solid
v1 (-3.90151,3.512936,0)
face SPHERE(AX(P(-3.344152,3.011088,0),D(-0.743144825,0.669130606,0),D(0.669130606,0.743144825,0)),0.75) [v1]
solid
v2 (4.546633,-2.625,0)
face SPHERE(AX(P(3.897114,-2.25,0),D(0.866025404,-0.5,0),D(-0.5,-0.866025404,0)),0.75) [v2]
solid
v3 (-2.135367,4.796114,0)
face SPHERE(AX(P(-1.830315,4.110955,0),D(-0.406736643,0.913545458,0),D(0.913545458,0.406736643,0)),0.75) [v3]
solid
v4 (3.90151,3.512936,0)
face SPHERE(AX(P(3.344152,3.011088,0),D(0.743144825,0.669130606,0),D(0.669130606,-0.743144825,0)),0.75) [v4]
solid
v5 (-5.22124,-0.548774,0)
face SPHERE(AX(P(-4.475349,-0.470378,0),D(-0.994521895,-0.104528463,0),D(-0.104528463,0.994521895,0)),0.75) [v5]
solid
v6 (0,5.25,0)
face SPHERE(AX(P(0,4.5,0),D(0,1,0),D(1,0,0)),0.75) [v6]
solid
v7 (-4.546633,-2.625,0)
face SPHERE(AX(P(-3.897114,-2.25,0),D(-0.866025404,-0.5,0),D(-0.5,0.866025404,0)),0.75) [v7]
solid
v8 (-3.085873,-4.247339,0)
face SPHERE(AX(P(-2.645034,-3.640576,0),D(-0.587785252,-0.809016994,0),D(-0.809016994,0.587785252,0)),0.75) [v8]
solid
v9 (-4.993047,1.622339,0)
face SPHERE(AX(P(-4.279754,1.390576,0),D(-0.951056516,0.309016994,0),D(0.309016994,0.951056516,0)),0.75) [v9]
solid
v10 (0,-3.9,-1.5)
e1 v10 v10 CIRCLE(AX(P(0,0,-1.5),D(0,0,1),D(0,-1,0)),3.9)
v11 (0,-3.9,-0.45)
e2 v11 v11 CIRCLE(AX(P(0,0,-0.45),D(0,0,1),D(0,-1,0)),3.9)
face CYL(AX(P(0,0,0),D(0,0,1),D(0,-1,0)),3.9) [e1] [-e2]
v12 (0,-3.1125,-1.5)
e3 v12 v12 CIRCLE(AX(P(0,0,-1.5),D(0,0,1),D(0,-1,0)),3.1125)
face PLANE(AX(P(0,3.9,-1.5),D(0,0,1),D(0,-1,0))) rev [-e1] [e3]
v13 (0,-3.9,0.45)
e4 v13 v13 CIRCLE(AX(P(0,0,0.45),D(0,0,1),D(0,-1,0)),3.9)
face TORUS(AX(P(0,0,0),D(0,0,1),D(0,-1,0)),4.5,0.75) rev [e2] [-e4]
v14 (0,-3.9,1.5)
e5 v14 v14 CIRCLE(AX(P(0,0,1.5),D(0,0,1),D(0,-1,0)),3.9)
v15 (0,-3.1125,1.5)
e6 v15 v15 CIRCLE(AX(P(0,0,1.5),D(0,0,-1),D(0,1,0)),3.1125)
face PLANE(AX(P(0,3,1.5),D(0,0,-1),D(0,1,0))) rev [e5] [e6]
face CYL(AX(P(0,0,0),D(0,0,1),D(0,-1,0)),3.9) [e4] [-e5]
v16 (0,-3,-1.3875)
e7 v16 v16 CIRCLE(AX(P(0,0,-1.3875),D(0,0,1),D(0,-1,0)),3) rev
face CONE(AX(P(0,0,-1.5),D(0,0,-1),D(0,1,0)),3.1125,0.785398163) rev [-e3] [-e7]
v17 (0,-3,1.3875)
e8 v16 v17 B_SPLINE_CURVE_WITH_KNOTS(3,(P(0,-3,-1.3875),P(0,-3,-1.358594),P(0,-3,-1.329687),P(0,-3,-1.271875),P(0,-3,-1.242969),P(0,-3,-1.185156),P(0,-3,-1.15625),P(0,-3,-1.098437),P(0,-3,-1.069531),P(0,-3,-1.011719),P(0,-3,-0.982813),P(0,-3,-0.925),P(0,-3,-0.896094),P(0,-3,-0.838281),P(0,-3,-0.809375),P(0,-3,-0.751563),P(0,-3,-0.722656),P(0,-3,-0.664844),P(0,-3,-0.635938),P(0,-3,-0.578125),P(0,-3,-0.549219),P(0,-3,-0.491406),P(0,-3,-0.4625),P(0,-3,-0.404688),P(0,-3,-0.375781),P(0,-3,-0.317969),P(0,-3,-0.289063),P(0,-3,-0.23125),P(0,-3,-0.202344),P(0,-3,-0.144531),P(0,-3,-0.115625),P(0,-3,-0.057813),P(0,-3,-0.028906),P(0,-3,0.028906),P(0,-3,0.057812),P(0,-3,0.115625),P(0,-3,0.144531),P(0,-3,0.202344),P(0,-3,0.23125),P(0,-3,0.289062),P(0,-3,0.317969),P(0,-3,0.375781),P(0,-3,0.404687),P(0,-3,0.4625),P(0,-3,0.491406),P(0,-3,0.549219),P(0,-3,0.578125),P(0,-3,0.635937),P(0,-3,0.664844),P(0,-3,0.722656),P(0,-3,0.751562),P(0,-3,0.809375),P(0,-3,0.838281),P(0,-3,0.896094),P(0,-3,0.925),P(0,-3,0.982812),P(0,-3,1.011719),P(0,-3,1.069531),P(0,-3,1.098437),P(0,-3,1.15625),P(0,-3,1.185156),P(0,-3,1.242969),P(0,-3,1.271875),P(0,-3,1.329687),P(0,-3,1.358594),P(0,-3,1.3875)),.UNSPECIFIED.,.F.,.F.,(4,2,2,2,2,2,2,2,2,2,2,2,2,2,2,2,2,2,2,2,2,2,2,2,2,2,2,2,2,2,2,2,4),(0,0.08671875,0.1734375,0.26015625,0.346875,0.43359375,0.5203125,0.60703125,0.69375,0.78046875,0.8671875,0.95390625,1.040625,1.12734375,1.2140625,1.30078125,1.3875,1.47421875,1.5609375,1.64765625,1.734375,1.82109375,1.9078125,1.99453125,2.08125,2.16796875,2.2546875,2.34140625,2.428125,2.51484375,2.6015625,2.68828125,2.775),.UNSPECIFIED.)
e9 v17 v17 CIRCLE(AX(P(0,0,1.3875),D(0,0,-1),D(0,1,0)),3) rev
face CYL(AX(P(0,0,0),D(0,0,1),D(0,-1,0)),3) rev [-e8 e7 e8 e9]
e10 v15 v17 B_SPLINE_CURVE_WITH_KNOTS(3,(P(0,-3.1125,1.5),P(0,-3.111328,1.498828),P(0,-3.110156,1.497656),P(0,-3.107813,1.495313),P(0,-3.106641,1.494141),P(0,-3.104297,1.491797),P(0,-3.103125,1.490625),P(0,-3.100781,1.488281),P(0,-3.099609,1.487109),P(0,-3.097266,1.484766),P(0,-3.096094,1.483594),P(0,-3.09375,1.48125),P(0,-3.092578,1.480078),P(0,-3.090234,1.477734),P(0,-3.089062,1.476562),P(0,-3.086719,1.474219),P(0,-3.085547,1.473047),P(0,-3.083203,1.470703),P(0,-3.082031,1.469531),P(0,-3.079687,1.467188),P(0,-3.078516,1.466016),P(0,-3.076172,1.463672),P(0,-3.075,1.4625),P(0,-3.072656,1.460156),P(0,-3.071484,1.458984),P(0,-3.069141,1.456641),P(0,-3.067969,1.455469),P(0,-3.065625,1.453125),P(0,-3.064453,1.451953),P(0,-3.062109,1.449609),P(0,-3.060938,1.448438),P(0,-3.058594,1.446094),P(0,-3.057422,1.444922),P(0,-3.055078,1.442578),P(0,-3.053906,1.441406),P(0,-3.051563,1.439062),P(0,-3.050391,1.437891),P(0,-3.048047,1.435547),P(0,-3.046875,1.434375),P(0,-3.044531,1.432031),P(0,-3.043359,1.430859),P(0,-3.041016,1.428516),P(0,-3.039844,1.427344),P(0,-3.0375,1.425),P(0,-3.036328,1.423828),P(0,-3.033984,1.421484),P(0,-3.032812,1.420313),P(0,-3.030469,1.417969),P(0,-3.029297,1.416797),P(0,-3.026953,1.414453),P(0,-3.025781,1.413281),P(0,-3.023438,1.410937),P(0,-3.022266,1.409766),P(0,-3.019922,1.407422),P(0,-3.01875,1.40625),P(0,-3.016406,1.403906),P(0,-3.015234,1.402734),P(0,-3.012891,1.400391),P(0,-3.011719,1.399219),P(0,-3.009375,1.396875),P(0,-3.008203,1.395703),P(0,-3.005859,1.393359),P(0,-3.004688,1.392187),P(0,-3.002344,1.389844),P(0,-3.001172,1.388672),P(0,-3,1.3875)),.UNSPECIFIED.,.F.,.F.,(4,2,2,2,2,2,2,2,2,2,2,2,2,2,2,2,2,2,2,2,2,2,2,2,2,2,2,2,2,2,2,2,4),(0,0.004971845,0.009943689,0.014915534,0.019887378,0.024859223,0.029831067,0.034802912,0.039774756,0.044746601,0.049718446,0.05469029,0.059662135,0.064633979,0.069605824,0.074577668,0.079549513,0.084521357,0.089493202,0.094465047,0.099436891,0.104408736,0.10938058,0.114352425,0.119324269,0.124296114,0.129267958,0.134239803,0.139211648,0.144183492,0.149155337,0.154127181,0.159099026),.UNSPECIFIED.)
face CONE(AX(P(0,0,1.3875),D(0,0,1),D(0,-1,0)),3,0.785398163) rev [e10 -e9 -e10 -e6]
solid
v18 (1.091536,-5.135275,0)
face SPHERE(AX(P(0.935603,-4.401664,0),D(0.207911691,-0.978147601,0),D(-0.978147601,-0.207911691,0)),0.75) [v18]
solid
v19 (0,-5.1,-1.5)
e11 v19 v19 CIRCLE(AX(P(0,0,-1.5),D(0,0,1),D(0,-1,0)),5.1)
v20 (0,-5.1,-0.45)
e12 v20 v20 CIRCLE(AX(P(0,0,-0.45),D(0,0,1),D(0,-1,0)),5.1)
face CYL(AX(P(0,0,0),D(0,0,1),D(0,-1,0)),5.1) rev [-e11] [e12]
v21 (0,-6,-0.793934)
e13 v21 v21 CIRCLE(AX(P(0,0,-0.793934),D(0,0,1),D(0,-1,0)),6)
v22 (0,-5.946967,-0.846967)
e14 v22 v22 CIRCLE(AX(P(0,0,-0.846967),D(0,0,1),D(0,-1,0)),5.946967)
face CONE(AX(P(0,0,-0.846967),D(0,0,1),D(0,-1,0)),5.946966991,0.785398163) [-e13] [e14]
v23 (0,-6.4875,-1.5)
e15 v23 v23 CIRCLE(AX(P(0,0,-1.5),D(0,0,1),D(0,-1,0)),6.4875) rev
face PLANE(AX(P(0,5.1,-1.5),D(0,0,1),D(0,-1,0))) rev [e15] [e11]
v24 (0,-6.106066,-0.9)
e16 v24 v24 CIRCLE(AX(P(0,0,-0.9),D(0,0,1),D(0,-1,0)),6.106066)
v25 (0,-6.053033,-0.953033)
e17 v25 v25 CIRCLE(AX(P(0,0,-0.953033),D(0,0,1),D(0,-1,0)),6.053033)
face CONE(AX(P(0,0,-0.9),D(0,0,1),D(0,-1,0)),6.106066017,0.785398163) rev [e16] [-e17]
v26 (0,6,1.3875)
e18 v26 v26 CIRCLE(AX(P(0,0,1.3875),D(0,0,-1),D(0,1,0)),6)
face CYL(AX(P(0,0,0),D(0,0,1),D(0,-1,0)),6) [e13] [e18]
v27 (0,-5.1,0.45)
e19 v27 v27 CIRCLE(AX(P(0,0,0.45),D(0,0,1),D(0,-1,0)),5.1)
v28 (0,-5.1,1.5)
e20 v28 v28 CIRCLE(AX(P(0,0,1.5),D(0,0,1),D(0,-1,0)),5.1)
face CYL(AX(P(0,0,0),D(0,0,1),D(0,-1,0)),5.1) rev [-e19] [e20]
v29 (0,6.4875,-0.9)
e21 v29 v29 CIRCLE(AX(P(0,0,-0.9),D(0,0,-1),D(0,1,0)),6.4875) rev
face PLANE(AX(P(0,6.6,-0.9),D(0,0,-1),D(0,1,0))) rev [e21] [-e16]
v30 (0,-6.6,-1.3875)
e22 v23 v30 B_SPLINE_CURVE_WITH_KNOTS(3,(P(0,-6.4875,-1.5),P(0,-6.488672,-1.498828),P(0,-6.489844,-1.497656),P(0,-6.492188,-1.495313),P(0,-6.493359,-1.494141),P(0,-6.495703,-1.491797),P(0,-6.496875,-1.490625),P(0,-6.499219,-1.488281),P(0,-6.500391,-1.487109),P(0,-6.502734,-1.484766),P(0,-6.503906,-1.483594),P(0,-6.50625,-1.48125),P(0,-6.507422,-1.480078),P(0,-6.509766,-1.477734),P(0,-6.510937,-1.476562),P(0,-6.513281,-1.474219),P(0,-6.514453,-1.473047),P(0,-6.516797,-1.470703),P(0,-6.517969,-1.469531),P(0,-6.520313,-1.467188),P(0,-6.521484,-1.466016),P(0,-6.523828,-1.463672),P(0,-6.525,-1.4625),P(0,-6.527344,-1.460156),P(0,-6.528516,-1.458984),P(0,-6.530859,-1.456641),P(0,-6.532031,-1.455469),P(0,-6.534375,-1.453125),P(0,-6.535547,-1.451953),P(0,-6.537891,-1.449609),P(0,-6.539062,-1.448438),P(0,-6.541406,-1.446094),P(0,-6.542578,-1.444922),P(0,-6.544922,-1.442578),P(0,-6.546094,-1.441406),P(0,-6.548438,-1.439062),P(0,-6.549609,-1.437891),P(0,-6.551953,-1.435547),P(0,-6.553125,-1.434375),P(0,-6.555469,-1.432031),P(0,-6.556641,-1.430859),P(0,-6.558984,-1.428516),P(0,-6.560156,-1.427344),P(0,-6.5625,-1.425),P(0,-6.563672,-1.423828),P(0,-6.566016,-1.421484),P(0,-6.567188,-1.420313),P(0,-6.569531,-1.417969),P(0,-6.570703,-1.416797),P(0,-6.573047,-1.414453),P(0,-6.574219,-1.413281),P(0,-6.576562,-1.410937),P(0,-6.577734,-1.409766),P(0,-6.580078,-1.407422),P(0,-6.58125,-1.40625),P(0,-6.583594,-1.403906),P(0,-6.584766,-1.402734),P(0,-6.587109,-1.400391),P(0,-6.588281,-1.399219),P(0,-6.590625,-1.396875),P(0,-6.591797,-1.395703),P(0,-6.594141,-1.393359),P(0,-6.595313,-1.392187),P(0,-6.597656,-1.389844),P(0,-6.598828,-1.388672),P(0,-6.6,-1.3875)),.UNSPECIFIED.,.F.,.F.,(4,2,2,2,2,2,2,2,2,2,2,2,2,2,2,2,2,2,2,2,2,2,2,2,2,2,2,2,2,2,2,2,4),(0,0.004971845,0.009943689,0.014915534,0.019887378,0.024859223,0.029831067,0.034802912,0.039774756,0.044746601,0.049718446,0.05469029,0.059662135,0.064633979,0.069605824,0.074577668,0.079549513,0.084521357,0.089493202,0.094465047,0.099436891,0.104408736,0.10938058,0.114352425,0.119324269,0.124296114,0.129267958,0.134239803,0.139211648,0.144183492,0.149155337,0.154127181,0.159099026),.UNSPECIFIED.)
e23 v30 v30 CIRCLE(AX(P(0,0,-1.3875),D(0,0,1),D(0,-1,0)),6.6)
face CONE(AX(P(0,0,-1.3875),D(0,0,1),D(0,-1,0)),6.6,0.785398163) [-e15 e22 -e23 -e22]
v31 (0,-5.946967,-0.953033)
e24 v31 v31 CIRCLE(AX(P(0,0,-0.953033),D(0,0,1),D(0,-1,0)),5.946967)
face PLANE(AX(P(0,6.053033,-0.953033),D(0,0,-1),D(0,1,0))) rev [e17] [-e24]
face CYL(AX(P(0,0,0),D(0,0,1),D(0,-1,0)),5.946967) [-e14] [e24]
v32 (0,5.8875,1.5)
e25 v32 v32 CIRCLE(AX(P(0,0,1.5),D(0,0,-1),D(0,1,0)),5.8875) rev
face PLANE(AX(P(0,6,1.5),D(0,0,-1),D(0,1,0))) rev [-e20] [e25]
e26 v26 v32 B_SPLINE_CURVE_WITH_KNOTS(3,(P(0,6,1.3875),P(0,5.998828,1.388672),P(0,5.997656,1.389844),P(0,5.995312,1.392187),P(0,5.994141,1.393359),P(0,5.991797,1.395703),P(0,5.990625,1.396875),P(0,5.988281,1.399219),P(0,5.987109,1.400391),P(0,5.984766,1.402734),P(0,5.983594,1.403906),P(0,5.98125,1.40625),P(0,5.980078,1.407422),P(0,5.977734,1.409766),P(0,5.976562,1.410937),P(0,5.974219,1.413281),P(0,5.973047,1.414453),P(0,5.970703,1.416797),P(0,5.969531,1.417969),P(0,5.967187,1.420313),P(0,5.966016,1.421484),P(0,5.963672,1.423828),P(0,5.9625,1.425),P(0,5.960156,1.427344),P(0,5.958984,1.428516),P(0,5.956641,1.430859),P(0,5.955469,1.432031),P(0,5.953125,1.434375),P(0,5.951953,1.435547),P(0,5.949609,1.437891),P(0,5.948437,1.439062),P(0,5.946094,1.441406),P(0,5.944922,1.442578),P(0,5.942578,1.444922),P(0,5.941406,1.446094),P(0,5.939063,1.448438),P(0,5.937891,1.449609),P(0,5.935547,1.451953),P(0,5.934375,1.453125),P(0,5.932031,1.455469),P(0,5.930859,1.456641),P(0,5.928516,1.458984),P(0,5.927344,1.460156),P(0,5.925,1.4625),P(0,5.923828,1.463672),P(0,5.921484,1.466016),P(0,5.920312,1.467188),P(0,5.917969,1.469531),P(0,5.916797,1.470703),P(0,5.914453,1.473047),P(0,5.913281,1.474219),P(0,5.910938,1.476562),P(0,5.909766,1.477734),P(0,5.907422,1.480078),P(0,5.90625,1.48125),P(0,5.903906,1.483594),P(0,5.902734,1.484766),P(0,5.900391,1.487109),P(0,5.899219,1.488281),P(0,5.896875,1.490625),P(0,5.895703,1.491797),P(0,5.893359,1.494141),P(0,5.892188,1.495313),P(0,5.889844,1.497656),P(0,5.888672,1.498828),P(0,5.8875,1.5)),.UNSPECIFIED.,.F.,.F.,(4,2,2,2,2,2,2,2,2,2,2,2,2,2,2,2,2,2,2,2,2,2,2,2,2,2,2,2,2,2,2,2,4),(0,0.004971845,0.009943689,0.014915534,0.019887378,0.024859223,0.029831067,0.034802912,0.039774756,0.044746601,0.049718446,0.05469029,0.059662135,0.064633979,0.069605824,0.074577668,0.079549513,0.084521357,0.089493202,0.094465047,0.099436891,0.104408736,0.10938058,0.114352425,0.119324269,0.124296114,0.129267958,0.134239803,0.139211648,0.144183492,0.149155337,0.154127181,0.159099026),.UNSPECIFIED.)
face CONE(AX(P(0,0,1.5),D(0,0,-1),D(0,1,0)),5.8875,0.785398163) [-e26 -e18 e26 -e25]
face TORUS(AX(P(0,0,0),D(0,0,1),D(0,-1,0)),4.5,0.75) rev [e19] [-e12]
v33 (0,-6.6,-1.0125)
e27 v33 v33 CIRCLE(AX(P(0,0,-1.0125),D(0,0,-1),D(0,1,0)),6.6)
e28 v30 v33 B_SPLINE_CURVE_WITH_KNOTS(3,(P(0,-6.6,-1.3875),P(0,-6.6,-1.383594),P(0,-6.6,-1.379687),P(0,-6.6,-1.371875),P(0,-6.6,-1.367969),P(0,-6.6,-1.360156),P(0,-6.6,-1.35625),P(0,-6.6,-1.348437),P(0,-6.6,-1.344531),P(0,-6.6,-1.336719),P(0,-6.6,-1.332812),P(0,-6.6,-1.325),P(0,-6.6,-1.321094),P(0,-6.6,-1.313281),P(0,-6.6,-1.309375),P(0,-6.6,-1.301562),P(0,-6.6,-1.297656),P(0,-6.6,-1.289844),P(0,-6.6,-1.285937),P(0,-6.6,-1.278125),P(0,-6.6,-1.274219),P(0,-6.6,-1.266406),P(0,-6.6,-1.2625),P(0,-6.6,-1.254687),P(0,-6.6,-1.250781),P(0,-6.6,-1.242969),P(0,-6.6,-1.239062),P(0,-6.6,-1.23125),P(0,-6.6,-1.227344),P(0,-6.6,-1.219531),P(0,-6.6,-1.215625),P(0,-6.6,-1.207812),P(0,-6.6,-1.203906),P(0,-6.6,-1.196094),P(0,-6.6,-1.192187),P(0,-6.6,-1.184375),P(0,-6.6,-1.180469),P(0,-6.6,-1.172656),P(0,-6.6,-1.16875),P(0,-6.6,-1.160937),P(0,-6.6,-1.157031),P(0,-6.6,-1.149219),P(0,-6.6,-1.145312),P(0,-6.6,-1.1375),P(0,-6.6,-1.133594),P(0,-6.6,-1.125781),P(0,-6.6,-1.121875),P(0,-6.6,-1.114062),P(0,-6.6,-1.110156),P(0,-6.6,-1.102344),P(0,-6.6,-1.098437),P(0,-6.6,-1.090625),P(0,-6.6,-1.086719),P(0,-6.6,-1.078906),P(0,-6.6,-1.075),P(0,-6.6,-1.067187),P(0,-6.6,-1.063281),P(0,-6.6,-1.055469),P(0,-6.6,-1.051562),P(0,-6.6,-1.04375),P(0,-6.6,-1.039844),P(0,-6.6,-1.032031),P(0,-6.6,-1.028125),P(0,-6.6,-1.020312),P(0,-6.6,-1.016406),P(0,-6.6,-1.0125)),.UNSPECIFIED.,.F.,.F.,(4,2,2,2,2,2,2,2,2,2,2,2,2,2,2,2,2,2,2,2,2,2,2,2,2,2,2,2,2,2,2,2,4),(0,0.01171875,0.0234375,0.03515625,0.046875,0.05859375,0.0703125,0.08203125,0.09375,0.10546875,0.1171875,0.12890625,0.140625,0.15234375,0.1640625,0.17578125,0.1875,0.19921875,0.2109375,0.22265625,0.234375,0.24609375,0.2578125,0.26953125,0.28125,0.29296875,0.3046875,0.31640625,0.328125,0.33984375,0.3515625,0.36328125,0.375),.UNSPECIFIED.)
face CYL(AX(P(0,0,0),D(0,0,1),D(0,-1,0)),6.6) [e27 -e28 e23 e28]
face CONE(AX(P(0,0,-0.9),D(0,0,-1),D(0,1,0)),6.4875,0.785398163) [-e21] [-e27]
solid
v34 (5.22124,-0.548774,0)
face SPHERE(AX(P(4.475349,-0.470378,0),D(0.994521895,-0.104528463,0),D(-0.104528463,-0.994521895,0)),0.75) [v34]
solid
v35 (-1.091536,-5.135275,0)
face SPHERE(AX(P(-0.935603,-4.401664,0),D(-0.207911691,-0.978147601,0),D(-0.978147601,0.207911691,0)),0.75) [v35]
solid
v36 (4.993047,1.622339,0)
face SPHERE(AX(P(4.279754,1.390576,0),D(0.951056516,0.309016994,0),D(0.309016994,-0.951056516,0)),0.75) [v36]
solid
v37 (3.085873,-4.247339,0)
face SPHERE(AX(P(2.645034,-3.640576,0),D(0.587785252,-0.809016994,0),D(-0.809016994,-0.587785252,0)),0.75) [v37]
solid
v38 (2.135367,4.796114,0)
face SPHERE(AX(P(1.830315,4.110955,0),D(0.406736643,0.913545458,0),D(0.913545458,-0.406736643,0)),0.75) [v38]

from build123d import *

# Parameters (mm, degrees)
FILLET1_SIZE      = 0.1125
FILLET2_SIZE      = 0.1125
CIRPATTERN3_COUNT = 15


with BuildPart() as part:
    # Sketch2 → Revolve1 (revolve)
    with BuildSketch(Plane(origin=(0, 0, 0), x_dir=(0, 0, -1), z_dir=(1, 0, 0))):
        with BuildLine():
            Line((1.5, 6.6), (0.9, 6.6))
            Line((0.9, 6.6), (0.9, 6.106066017))
            Line((0.9, 6.106066017), (0.953033009, 6.053033009))
            Line((0.953033009, 6.053033009), (0.953033009, 5.946966991))
            Line((0.953033009, 5.946966991), (0.846966991, 5.946966991))
            Line((0.846966991, 5.946966991), (0.793933983, 6))
            Line((0.793933983, 6), (-1.5, 6))
            Line((-1.5, 6), (-1.5, 5.1))
            Line((-1.5, 5.1), (-0.45, 5.1))
            ThreePointArc((-0.45, 5.1), (0, 5.25), (0.45, 5.1))
            Line((0.45, 5.1), (1.5, 5.1))
            Line((1.5, 5.1), (1.5, 6.6))
        make_face()
        with BuildLine():
            Line((1.5, 3), (-1.5, 3))
            Line((-1.5, 3), (-1.5, 3.9))
            Line((-1.5, 3.9), (-0.45, 3.9))
            ThreePointArc((-0.45, 3.9), (0, 3.75), (0.45, 3.9))
            Line((0.45, 3.9), (1.5, 3.9))
            Line((1.5, 3.9), (1.5, 3))
        make_face()
    revolve(axis=Axis((0, 0, 0), (0, 0, -1)))

    # Fillet1
    fillet1_edges = [part.edges().sort_by_distance(p)[0] for p in [
        (0, -6.6, -1.5),
        (0, -6.6, -0.9),
        (0, -6, 1.5),
    ]]
    chamfer(fillet1_edges, length=FILLET1_SIZE)

    # Fillet2
    fillet2_edges = [part.edges().sort_by_distance(p)[0] for p in [
        (0, -3, -1.5),
        (0, -3, 1.5),
    ]]
    chamfer(fillet2_edges, length=FILLET2_SIZE)


with BuildPart() as body_2:
    # Sketch7 → Revolve3 (revolve)
    with BuildSketch(Plane.XY):
        with BuildLine():
            Line((0, 5.25), (0, 3.75))
            ThreePointArc((0, 3.75), (-0.75, 4.5), (0, 5.25))
        make_face()
    revolve(axis=Axis((0, 5.25, 0), (0, -1, 0)))


with BuildPart() as cirpattern3_1:
    # CirPattern3: pattern copy
    add(body_2.part.rotate(Axis((0, 0, 0), (0, 0, -1)), 1 * 360 / CIRPATTERN3_COUNT))


with BuildPart() as cirpattern3_2:
    # CirPattern3: pattern copy
    add(body_2.part.rotate(Axis((0, 0, 0), (0, 0, -1)), 2 * 360 / CIRPATTERN3_COUNT))


with BuildPart() as cirpattern3_3:
    # CirPattern3: pattern copy
    add(body_2.part.rotate(Axis((0, 0, 0), (0, 0, -1)), 3 * 360 / CIRPATTERN3_COUNT))


with BuildPart() as cirpattern3_4:
    # CirPattern3: pattern copy
    add(body_2.part.rotate(Axis((0, 0, 0), (0, 0, -1)), 4 * 360 / CIRPATTERN3_COUNT))


with BuildPart() as cirpattern3_5:
    # CirPattern3: pattern copy
    add(body_2.part.rotate(Axis((0, 0, 0), (0, 0, -1)), 5 * 360 / CIRPATTERN3_COUNT))


with BuildPart() as cirpattern3_6:
    # CirPattern3: pattern copy
    add(body_2.part.rotate(Axis((0, 0, 0), (0, 0, -1)), 6 * 360 / CIRPATTERN3_COUNT))


with BuildPart() as cirpattern3_7:
    # CirPattern3: pattern copy
    add(body_2.part.rotate(Axis((0, 0, 0), (0, 0, -1)), 7 * 360 / CIRPATTERN3_COUNT))


with BuildPart() as cirpattern3_8:
    # CirPattern3: pattern copy
    add(body_2.part.rotate(Axis((0, 0, 0), (0, 0, -1)), 8 * 360 / CIRPATTERN3_COUNT))


with BuildPart() as cirpattern3_9:
    # CirPattern3: pattern copy
    add(body_2.part.rotate(Axis((0, 0, 0), (0, 0, -1)), 9 * 360 / CIRPATTERN3_COUNT))


with BuildPart() as cirpattern3_10:
    # CirPattern3: pattern copy
    add(body_2.part.rotate(Axis((0, 0, 0), (0, 0, -1)), 10 * 360 / CIRPATTERN3_COUNT))


with BuildPart() as cirpattern3_11:
    # CirPattern3: pattern copy
    add(body_2.part.rotate(Axis((0, 0, 0), (0, 0, -1)), 11 * 360 / CIRPATTERN3_COUNT))


with BuildPart() as cirpattern3_12:
    # CirPattern3: pattern copy
    add(body_2.part.rotate(Axis((0, 0, 0), (0, 0, -1)), 12 * 360 / CIRPATTERN3_COUNT))


with BuildPart() as cirpattern3_13:
    # CirPattern3: pattern copy
    add(body_2.part.rotate(Axis((0, 0, 0), (0, 0, -1)), 13 * 360 / CIRPATTERN3_COUNT))


with BuildPart() as cirpattern3_14:
    # CirPattern3: pattern copy
    add(body_2.part.rotate(Axis((0, 0, 0), (0, 0, -1)), 14 * 360 / CIRPATTERN3_COUNT))


solid = Compound([part.part, body_2.part, cirpattern3_1.part, cirpattern3_2.part, cirpattern3_3.part, cirpattern3_4.part, cirpattern3_5.part, cirpattern3_6.part, cirpattern3_7.part, cirpattern3_8.part, cirpattern3_9.part, cirpattern3_10.part, cirpattern3_11.part, cirpattern3_12.part, cirpattern3_13.part, cirpattern3_14.part])
